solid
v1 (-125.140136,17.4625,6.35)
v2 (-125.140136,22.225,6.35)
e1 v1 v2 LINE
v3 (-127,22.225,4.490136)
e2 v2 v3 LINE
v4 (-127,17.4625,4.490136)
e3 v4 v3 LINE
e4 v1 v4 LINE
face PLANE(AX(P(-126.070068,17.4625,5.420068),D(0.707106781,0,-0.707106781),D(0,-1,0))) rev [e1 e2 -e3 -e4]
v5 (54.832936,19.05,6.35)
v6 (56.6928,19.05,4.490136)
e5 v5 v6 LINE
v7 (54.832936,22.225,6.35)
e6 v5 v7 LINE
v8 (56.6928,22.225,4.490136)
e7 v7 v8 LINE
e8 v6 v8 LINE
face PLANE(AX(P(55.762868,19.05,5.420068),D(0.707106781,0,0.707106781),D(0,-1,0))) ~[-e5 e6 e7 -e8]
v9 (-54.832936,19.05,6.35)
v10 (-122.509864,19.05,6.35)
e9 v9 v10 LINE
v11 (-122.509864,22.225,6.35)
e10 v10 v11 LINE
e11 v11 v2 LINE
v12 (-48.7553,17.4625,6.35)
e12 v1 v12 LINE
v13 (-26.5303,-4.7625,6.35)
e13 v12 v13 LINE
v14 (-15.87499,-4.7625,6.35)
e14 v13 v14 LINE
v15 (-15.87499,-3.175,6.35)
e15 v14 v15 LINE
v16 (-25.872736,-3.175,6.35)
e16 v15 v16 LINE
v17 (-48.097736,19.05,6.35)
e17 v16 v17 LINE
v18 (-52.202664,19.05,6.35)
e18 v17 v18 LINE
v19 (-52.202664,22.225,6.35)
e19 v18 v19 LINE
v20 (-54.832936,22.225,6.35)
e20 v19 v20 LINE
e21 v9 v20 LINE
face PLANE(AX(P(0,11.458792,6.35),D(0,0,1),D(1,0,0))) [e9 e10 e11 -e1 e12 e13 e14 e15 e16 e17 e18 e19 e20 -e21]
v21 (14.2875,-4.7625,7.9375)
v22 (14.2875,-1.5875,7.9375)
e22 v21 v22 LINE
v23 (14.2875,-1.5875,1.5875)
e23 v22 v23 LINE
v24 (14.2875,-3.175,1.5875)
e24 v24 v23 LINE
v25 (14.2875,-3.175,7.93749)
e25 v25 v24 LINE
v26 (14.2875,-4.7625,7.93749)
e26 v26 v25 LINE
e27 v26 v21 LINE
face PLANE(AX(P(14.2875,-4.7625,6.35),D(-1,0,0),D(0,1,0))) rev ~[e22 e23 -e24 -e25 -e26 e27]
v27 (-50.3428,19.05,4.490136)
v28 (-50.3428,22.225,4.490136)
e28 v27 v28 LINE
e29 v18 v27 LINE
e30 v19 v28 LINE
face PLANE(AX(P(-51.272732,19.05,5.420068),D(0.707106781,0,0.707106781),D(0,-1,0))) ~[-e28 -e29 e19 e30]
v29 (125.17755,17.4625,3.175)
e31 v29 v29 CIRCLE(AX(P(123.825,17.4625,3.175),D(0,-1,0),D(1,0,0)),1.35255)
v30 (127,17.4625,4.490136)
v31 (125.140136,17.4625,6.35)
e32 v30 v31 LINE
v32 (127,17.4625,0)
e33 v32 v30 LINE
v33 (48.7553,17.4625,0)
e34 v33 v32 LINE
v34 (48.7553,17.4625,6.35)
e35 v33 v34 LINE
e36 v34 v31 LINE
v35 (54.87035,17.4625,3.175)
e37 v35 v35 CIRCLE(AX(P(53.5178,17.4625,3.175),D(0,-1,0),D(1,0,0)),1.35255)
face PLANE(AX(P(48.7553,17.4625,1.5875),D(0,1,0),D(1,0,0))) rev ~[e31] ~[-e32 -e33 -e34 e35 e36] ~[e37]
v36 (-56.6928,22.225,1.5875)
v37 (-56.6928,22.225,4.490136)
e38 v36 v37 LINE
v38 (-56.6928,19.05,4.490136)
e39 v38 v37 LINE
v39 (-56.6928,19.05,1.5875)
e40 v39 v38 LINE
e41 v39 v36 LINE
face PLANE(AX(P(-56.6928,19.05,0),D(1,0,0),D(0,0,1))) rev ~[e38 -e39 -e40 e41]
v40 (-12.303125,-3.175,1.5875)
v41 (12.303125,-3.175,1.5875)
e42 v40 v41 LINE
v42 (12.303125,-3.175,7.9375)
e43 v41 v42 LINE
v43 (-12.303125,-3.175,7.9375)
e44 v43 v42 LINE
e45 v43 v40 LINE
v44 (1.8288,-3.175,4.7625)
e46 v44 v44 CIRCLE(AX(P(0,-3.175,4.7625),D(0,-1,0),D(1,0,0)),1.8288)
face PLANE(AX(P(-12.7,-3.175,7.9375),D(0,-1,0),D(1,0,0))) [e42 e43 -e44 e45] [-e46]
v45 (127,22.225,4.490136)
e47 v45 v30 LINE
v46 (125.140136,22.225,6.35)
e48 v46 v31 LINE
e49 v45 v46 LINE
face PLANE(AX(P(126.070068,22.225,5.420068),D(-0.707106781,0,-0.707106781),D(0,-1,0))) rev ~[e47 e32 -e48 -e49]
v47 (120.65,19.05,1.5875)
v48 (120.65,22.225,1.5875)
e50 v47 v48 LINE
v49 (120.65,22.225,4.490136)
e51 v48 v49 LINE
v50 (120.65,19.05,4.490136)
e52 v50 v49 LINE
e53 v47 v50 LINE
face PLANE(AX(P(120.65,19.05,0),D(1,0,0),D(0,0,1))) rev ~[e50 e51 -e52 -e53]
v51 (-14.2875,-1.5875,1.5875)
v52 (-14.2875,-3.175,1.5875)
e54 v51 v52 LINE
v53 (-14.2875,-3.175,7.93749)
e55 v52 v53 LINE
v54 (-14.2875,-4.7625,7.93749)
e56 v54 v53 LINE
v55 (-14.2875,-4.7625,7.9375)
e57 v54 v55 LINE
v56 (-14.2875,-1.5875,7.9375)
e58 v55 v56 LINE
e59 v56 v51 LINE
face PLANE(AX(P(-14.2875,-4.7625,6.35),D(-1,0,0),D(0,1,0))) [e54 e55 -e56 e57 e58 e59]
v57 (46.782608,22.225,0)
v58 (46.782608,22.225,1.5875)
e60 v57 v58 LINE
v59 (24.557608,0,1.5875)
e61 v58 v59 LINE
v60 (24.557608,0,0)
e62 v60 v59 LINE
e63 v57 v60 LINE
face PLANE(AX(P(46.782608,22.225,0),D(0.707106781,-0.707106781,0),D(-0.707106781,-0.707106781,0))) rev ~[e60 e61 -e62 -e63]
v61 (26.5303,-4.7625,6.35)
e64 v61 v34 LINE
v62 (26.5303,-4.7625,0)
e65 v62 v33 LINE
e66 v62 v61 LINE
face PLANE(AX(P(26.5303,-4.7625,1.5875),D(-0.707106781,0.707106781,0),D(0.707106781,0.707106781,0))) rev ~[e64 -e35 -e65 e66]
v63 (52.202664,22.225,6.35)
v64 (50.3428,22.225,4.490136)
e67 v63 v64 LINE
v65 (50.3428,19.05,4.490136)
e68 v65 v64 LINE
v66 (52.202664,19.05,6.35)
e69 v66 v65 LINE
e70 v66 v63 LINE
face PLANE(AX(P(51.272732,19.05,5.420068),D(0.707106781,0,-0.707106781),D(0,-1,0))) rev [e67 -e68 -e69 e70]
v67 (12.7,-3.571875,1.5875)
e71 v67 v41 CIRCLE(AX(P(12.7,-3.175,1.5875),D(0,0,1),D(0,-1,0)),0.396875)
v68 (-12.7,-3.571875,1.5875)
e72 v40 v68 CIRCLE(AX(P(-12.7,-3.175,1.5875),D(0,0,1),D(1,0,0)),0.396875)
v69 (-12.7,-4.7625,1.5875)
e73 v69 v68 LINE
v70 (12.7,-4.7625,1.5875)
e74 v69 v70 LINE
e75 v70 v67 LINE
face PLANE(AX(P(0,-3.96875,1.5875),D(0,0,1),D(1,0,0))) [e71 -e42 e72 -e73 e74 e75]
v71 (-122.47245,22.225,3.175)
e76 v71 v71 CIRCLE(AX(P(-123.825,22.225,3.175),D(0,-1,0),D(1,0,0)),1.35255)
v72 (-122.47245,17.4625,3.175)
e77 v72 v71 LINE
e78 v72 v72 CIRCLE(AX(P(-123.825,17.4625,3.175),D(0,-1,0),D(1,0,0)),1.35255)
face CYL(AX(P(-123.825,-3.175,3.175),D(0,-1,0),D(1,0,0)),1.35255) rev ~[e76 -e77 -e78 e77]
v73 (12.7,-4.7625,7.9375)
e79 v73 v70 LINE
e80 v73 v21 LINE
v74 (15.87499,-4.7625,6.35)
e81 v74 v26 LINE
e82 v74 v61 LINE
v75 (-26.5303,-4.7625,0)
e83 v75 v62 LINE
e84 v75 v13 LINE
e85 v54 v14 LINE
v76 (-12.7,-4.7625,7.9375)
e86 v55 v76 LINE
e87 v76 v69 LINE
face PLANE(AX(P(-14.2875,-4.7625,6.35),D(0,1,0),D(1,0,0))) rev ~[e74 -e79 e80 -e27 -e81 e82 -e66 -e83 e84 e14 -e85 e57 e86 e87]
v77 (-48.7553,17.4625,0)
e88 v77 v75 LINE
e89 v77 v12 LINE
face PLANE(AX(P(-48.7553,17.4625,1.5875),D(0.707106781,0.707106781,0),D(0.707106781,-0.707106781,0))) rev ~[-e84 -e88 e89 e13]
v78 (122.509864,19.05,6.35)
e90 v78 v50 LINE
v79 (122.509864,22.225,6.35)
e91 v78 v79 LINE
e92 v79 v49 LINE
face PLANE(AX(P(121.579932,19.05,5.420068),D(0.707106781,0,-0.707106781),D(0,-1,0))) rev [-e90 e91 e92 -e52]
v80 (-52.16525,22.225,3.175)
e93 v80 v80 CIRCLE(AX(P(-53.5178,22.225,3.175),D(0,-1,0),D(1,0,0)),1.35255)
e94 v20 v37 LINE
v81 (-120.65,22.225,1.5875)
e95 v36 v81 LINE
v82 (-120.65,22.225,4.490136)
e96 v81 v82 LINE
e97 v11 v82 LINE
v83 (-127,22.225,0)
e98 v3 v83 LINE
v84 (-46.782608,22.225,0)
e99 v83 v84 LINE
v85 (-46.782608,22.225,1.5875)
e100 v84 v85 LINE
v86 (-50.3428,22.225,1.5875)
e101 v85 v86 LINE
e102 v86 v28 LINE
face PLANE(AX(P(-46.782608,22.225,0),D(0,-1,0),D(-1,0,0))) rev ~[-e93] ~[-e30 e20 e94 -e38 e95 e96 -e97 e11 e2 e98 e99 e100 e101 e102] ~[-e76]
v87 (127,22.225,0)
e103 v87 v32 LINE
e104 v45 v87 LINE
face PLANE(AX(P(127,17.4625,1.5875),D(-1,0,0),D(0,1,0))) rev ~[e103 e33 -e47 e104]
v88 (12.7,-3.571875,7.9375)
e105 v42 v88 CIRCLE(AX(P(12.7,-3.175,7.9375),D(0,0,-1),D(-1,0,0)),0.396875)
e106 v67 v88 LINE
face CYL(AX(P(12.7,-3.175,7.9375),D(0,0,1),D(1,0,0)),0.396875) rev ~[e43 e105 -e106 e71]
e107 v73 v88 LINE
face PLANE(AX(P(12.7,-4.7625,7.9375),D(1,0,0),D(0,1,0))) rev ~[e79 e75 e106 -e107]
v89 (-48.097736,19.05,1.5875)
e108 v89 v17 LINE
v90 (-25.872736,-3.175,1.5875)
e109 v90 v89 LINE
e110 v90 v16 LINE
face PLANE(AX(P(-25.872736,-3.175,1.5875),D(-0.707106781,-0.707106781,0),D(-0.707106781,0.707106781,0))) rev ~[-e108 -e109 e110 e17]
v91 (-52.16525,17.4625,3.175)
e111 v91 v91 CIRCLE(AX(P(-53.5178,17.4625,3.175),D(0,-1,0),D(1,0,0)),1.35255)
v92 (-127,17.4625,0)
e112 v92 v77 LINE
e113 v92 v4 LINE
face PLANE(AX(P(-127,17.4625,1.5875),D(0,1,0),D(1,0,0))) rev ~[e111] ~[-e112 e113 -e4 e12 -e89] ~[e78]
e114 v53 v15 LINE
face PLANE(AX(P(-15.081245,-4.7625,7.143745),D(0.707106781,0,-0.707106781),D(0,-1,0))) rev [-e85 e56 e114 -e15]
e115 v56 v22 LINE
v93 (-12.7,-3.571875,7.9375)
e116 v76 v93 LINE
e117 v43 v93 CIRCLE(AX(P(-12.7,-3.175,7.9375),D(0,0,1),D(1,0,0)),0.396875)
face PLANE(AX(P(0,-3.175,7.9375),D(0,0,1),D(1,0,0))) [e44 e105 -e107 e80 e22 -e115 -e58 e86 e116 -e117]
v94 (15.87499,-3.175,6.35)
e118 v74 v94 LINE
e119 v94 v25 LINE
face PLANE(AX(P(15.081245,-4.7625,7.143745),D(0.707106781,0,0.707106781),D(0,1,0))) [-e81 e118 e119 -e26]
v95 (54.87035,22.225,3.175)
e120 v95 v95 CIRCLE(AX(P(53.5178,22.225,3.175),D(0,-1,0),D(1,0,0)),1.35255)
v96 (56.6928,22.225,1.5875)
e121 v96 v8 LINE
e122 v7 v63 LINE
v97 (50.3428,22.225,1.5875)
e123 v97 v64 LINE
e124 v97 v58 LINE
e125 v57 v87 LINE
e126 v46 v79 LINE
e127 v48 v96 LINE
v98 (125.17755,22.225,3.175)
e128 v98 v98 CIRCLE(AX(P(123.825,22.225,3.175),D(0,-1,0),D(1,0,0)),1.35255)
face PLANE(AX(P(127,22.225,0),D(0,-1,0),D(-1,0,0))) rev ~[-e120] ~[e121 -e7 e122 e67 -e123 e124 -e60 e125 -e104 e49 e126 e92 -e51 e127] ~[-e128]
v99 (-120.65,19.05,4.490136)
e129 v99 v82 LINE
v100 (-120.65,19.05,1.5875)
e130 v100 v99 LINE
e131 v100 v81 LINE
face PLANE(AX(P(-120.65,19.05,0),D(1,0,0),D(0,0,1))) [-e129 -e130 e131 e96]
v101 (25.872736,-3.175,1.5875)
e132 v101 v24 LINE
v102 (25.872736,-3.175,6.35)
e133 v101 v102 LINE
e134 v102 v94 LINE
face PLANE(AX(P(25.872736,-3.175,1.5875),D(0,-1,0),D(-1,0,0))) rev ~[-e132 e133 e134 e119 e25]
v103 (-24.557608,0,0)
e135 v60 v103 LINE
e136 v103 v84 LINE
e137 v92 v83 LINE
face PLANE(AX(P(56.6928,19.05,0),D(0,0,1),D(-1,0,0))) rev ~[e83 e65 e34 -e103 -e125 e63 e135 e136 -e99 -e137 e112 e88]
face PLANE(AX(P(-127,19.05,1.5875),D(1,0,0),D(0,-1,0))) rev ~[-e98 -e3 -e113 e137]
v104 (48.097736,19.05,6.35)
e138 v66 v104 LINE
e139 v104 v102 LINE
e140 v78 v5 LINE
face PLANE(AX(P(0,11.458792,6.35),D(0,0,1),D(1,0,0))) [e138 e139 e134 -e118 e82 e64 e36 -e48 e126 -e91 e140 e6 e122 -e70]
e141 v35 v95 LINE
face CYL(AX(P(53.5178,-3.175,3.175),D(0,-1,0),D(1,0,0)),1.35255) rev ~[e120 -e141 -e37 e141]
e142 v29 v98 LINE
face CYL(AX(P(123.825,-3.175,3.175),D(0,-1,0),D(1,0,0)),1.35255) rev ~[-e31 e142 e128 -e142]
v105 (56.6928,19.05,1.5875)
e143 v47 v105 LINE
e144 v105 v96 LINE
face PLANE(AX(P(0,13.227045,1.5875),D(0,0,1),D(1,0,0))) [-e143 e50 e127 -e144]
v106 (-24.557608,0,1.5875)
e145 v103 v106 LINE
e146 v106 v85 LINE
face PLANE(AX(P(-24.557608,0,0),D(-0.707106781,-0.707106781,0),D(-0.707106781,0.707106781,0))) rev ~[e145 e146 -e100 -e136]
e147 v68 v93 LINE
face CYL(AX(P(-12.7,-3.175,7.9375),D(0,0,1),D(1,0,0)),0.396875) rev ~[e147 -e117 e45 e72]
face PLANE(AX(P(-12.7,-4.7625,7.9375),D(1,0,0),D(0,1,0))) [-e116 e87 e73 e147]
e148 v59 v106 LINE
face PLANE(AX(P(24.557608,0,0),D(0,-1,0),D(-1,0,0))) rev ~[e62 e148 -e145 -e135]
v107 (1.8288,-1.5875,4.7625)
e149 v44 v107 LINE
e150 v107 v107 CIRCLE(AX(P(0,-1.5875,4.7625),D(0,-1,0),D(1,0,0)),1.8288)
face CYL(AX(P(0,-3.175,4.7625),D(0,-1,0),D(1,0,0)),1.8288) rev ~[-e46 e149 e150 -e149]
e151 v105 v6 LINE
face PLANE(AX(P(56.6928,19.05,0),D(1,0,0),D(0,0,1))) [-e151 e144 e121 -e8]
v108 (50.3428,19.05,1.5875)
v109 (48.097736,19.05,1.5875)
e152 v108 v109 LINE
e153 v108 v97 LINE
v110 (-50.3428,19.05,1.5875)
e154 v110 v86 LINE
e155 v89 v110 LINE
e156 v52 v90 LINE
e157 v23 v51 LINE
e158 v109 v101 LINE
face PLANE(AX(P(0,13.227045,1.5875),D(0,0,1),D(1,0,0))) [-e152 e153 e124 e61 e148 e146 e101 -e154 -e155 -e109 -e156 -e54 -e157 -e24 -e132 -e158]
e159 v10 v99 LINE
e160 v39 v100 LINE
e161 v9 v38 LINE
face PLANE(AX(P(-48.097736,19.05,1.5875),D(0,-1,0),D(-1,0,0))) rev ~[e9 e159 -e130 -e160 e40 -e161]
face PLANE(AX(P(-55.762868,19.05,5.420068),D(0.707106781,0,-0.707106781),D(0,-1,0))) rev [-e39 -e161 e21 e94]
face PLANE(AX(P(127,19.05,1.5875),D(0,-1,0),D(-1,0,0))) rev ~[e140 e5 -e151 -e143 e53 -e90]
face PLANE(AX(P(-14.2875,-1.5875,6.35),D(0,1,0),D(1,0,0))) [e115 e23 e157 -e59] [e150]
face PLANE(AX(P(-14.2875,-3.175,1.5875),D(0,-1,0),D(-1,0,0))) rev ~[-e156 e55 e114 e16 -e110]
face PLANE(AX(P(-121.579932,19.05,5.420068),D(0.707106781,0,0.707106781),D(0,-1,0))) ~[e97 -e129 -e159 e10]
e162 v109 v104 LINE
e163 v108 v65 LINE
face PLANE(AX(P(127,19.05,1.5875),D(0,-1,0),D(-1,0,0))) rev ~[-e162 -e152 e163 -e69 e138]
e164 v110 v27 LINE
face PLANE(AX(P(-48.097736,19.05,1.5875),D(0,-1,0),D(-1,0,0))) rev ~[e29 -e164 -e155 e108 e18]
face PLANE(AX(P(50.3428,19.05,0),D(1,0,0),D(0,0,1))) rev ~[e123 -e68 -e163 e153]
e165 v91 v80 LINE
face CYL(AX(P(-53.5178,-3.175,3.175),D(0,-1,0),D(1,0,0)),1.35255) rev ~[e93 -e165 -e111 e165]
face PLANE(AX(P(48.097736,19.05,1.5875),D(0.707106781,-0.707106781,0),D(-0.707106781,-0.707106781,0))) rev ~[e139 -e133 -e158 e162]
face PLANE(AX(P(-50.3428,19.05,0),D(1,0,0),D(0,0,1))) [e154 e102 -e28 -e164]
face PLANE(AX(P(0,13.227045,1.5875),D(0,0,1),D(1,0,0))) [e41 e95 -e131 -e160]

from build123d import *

# Parameters (mm, degrees)
F1_DEPTH  = 1.5875
F3_DEPTH  = 4.7625
F4_W      = 6.35
F4_H      = 6.35
F5_DEPTH  = 3.175
F6_SIZE   = 1.8598642
F7_W      = 28.575
F7_H      = 3.175
F8_DEPTH  = 1.5875
F9_W      = 25.4
F9_H      = 1.5875
F10_DEPTH = 6.35
F11_SIZE  = 1.58749
F12_R     = 1.35255
F12_R_2   = 1.8288
F13_DEPTH = 25.4
F14_R     = 0.396875
F15_DEPTH = 6.35


# Not quite as in the source:
# - a fillet or chamfer is up to 0.001 mm smaller than in the source, because OpenCascade refuses the exact size


with BuildPart() as f1:
    # F0 (on Top) → F1 (new body)
    with BuildSketch(Plane.XY):
        Polygon((-46.7826079092, 22.225), (-127, 22.225), (-127, 17.4625), (-48.7553, 17.4625), (-26.5303, -4.7625), (26.5303, -4.7625), (48.7553, 17.4625), (127, 17.4625), (127, 22.225), (46.7826079092, 22.225), (24.5576079092, 0), (-24.5576079092, 0), align=None)
    extrude(amount=F1_DEPTH)

    # F2 (on face) → F3 (join)
    with BuildSketch(Plane.XY.offset(1.5875)):
        Polygon((-127, 19.05), (-127, 17.4625), (-48.7553, 17.4625), (-26.5303, -4.7625), (26.5303, -4.7625), (48.7553, 17.4625), (127, 17.4625), (127, 19.05), (48.0977359697, 19.05), (25.8727359697, -3.175), (14.2875, -3.175), (14.2875, -1.5875), (-14.2875, -1.5875), (-14.2875, -3.175), (-25.8727359697, -3.175), (-48.0977359697, 19.05), align=None)
    extrude(amount=F3_DEPTH)

    # F4 (on face) → F5 (join, through all)
    with BuildSketch(Plane(origin=(0, 19.05, 0), x_dir=(-1, 0, 0), z_dir=(0, 1, 0))):
        with Locations((-53.5178, 3.175)):
            Rectangle(F4_W, F4_H)
        with Locations((-123.825, 3.175)):
            Rectangle(F4_W, F4_H)
        with Locations((123.825, 3.175)):
            Rectangle(F4_W, F4_H)
        with Locations((53.5178, 3.175)):
            Rectangle(F4_W, F4_H)
    extrude(amount=F5_DEPTH)

    # F6
    f6_edges = [f1.edges().sort_by_distance(p)[0] for p in [
        (-127, 19.84375, 6.35),
        (-120.65, 20.6375, 6.35),
        (-56.6928, 20.6375, 6.35),
        (-50.3428, 20.6375, 6.35),
        (50.3428, 20.6375, 6.35),
        (56.6928, 20.6375, 6.35),
        (120.65, 20.6375, 6.35),
        (127, 19.84375, 6.35),
    ]]
    chamfer(f6_edges, length=F6_SIZE)

    # F7 (on face) → F8 (join)
    with BuildSketch(Plane.XY.offset(6.35)):
        with Locations((0, -3.175)):
            Rectangle(F7_W, F7_H)
    extrude(amount=F8_DEPTH)

    # F9 (on face) → F10 (cut, through all)
    with BuildSketch(Plane.XY.offset(7.9375)):
        with Locations((0, -3.96875)):
            Rectangle(F9_W, F9_H)
    extrude(amount=-F10_DEPTH, mode=Mode.SUBTRACT)

    # F11 (size 1.5875 in the source; OpenCascade refuses exactly that, so slightly less here)
    f11_edges = [f1.edges().sort_by_distance(p)[0] for p in [
        (-14.2875, -3.96875, 6.35),
        (14.2875, -3.96875, 6.35),
    ]]
    chamfer(f11_edges, length=F11_SIZE)

    # F12 (on face) → F13 (cut, through all)
    with BuildSketch(Plane.XZ.offset(3.175)):
        with Locations((53.5178, 3.175)):
            Circle(F12_R)
        with Locations((123.825, 3.175)):
            Circle(F12_R)
        with Locations((-123.825, 3.175)):
            Circle(F12_R)
        with Locations((-53.5178, 3.175)):
            Circle(F12_R)
        with Locations((0, 4.7625)):
            Circle(F12_R_2)
    extrude(amount=-F13_DEPTH, mode=Mode.SUBTRACT)

    # F14 (on face) → F15 (cut, through all)
    with BuildSketch(Plane.XY.offset(7.9375)):
        with Locations((12.7, -3.175)):
            Circle(F14_R)
        with Locations((-12.7, -3.175)):
            Circle(F14_R)
    extrude(amount=-F15_DEPTH, mode=Mode.SUBTRACT)


solid = f1.part
